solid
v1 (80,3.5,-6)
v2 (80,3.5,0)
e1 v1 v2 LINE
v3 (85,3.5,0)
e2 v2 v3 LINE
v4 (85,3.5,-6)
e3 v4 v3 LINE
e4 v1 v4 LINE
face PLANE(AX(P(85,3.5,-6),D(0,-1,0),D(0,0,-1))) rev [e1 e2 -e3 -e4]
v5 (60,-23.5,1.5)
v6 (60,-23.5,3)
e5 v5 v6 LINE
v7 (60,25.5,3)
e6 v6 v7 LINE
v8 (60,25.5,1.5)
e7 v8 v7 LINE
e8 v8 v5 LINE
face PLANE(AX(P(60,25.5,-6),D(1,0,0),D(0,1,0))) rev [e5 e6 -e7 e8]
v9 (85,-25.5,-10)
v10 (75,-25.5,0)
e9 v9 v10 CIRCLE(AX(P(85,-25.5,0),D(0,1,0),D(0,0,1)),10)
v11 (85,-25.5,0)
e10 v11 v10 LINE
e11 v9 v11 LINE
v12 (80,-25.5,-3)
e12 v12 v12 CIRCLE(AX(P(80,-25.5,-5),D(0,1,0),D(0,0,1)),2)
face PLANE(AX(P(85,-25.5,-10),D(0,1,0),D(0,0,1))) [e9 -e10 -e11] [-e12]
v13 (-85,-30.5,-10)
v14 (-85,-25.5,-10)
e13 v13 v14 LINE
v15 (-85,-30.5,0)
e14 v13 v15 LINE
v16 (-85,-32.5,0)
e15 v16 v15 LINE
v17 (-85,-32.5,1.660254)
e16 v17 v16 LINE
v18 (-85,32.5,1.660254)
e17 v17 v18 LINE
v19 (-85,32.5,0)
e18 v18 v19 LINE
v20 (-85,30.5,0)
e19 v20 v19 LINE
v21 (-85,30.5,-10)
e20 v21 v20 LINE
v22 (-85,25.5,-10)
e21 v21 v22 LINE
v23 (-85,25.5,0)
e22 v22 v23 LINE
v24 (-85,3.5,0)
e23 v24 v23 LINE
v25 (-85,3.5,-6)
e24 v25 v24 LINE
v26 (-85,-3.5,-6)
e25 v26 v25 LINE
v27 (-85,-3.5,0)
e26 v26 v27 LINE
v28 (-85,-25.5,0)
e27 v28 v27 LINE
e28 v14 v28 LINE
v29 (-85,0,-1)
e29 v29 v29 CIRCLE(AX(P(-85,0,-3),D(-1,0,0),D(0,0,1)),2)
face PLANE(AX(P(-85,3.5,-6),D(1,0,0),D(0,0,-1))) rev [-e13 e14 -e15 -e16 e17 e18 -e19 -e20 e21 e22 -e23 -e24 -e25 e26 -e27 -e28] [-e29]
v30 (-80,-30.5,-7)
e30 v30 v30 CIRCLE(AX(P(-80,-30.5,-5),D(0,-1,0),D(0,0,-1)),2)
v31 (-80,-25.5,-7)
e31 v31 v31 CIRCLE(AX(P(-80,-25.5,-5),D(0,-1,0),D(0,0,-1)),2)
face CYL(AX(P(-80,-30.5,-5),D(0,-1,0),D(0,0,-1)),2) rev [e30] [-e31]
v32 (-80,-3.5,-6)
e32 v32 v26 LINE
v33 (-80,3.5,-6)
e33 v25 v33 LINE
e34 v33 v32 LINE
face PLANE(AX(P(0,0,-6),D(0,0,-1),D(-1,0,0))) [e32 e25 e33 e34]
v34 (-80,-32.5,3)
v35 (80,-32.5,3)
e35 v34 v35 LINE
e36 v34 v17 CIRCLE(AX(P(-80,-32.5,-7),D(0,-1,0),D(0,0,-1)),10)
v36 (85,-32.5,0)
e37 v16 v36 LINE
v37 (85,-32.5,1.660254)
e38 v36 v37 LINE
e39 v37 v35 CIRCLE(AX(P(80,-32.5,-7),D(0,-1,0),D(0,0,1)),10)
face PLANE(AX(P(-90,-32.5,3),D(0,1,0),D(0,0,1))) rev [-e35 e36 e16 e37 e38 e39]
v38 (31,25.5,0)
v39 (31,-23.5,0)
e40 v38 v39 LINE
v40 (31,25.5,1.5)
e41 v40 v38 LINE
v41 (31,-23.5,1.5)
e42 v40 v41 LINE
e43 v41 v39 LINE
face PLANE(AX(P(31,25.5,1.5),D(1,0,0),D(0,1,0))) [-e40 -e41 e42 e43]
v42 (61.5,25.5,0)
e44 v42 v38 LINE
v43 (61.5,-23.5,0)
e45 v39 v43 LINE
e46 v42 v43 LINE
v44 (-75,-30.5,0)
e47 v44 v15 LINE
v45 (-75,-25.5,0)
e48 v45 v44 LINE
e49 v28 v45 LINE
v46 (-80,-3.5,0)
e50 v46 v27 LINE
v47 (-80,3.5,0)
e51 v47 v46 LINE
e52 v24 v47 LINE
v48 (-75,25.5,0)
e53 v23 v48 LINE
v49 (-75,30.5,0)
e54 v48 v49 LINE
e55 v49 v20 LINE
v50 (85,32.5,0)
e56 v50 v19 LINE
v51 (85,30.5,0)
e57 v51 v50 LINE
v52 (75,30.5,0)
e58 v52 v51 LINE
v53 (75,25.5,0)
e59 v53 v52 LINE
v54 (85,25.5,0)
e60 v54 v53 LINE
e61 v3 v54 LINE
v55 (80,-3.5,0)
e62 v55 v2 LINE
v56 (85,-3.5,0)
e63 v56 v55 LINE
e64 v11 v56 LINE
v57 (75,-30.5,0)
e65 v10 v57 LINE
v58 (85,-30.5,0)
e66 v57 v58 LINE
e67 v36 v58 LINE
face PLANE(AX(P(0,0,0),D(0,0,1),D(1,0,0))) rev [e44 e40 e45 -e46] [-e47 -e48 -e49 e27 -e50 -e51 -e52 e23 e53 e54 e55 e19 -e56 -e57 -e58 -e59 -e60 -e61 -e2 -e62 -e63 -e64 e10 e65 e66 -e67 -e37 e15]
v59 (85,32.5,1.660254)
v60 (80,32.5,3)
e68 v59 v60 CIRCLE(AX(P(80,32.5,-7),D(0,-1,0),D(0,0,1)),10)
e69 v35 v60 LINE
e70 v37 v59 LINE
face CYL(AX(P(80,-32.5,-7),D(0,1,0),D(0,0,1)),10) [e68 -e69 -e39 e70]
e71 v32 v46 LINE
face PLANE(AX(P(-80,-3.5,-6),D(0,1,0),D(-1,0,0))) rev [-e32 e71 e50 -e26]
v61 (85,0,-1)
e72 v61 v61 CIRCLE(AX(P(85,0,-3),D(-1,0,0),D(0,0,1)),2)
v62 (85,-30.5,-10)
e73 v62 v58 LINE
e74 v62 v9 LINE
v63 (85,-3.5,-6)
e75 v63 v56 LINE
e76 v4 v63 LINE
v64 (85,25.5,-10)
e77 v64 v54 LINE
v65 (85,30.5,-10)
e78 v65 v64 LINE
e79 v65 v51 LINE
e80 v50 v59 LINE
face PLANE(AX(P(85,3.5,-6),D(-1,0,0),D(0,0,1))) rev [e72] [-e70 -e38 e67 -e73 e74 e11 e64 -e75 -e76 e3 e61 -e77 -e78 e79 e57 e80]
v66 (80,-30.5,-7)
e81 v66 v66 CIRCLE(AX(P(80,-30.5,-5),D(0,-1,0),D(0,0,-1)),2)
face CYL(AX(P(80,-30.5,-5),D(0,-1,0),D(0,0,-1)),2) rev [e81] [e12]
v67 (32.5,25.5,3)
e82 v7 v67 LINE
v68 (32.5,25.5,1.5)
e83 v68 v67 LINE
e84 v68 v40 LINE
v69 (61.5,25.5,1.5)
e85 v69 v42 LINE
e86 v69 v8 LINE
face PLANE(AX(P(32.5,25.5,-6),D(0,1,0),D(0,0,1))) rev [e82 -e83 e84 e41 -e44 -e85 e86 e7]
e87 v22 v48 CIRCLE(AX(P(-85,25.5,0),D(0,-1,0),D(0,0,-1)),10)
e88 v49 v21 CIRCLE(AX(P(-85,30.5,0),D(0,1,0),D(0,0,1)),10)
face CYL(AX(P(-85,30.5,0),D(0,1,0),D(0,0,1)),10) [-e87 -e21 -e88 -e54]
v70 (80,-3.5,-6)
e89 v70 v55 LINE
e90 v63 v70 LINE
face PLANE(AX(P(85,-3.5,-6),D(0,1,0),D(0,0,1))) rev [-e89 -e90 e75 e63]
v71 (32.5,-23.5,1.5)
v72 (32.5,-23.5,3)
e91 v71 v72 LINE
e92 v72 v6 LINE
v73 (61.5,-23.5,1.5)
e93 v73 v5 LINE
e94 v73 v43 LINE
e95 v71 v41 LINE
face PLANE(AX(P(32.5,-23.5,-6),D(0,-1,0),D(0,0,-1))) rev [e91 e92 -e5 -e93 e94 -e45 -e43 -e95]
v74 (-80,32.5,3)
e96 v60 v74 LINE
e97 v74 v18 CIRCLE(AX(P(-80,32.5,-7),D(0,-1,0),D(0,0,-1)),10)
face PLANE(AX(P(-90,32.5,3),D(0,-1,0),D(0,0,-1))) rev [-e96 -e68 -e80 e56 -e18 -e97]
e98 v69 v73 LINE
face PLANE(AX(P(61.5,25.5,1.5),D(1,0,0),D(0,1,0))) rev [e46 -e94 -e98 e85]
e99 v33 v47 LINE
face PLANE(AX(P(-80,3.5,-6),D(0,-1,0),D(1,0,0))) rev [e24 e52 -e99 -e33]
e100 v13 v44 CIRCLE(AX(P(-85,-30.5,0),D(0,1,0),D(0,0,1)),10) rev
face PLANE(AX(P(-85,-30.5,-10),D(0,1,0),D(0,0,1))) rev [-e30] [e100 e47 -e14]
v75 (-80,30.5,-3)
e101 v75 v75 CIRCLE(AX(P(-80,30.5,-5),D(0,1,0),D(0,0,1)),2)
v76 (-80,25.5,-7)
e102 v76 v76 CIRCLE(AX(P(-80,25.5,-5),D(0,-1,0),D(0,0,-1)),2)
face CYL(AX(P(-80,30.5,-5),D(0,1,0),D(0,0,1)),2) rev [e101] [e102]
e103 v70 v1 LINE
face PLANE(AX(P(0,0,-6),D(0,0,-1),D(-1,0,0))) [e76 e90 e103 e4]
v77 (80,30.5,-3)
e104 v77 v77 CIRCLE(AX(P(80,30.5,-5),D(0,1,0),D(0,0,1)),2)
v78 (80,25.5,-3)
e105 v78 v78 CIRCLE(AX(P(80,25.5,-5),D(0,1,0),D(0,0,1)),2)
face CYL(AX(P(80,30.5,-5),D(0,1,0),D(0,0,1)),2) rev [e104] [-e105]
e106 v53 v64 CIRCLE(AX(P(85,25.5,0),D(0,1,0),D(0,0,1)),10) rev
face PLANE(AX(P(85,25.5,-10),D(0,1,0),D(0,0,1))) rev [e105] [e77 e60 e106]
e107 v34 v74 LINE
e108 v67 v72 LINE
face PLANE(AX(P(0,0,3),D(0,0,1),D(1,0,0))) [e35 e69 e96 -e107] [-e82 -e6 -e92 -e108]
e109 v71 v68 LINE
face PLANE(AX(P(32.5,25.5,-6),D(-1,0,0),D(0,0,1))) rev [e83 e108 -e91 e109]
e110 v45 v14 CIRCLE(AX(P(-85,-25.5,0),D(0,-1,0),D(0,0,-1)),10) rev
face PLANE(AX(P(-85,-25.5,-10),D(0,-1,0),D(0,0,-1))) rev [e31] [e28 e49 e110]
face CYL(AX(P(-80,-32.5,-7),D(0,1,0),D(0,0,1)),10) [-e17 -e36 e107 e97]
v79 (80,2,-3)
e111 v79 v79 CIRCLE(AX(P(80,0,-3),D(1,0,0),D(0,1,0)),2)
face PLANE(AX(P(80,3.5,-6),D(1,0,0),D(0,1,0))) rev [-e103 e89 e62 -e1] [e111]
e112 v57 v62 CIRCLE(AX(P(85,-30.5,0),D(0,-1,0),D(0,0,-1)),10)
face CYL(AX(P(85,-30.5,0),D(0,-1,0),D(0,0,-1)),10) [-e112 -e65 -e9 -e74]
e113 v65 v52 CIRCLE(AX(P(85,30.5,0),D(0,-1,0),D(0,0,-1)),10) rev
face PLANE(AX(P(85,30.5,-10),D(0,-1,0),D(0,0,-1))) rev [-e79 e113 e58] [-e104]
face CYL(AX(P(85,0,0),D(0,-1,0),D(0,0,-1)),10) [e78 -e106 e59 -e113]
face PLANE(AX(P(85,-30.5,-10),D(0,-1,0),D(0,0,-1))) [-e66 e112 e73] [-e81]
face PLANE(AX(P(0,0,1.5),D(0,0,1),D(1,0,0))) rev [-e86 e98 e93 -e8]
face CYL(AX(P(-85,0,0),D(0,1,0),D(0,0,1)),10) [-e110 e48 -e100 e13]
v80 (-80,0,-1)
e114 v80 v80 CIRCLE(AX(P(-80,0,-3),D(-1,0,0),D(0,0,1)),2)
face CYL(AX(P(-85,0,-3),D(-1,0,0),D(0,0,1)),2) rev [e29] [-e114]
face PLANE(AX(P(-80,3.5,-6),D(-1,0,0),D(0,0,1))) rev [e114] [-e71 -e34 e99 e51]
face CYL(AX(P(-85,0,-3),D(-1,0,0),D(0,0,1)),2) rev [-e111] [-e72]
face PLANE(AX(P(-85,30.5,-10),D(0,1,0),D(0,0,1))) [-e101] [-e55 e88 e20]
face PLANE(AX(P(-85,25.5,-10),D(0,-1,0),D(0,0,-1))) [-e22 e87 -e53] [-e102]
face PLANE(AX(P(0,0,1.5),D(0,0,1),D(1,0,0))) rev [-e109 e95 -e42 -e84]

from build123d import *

# Parameters (mm, degrees)
SKIZZE1_W                                  = 180
SKIZZE1_H                                  = 65
AUFSATZ_LINEAR_AUSTRAGEN1_DEPTH            = 3
SKIZZE3_W                                  = 5
SKIZZE3_H                                  = 7
AUFSATZ_LINEAR_AUSTRAGEN2_DEPTH            = 6
F_4_0_4_DURCHMESSER_BOHRUNG1_D             = 4
SCHNITT_LINEAR_AUSTRAGEN1_DEPTH            = 112.180034179
SKIZZE7_W                                  = 27.5
SKIZZE7_H                                  = 49
SCHNITT_LINEAR_AUSTRAGEN2_DEPTH            = 92.445338864
SKIZZE8_W                                  = 10
SKIZZE8_H                                  = 5
AUFSATZ_LINEAR_AUSTRAGEN3_DEPTH            = 10
SPIEGELN1_AT_THE_SECOND_PLANE_COPY_1_SKE_W = 10
SPIEGELN1_AT_THE_SECOND_PLANE_COPY_1_SKE_H = 5
SPIEGELN1_AT_THE_SECOND_PLANE_COPY_1_DEPTH = 10
VERRUNDUNG1_R                              = 10
F_4_0_4_DURCHMESSER_BOHRUNG2_D             = 4
F_4_0_4_DURCHMESSER_BOHRUNG2_DEPTH         = 5
F_4_0_4_DURCHMESSER_BOHRUNG3_D             = 4
F_4_0_4_DURCHMESSER_BOHRUNG3_DEPTH         = 5
SKIZZE13_W                                 = 30.5
SKIZZE13_H                                 = 49
SCHNITT_LINEAR_AUSTRAGEN4_DEPTH            = 1.5


with BuildPart() as part:
    # Skizze1 → Aufsatz-Linear austragen1 (new body)
    with BuildSketch(Plane.XY):
        Rectangle(SKIZZE1_W, SKIZZE1_H)
    extrude(amount=AUFSATZ_LINEAR_AUSTRAGEN1_DEPTH)

    # Skizze3 → Aufsatz-Linear austragen2 (add)
    with BuildSketch(Plane(origin=(0, 0, 0), x_dir=(-1, 0, 0), z_dir=(0, 0, -1))):
        with Locations((-82.5, 0)):
            Rectangle(SKIZZE3_W, SKIZZE3_H)
        with Locations((82.5, 0)):
            Rectangle(SKIZZE3_W, SKIZZE3_H)
    extrude(amount=AUFSATZ_LINEAR_AUSTRAGEN2_DEPTH)

    # Ø4.0 (4) Durchmesser Bohrung1 (through all)
    with Locations(Plane.ZY.offset(85)):
        with Locations((-3, 0)):
            Hole(F_4_0_4_DURCHMESSER_BOHRUNG1_D / 2)

    # Skizze6 → Schnitt-Linear austragen1 (cut, through all)
    with BuildSketch(Plane(origin=(0, 32.5, 0), x_dir=(1, 0, 0), z_dir=(0, 1, 0))):
        with BuildLine():
            Line((-80, -3), (-90, -3))
            Line((-90, -3), (-90, 0))
            Line((-90, 0), (-85, 0))
            Line((-85, 0), (-85, -1.660254038))
            ThreePointArc((-85, -1.660254038), (-82.588190451, -2.659258263), (-80, -3))
        make_face()
        with BuildLine():
            Line((80, -3), (90, -3))
            Line((90, -3), (90, 0))
            Line((90, 0), (85, 0))
            Line((85, 0), (85, -1.660254038))
            ThreePointArc((85, -1.660254038), (82.588190451, -2.659258263), (80, -3))
        make_face()
    extrude(amount=-SCHNITT_LINEAR_AUSTRAGEN1_DEPTH, mode=Mode.SUBTRACT)

    # Skizze7 → Schnitt-Linear austragen2 (cut, through all)
    with BuildSketch(Plane.XY.offset(3)):
        with Locations((46.25, 1)):
            Rectangle(SKIZZE7_W, SKIZZE7_H)
    extrude(amount=-SCHNITT_LINEAR_AUSTRAGEN2_DEPTH, mode=Mode.SUBTRACT)

    # Skizze8 → Aufsatz-Linear austragen3 (add)
    with BuildSketch(Plane(origin=(0, 0, 0), x_dir=(-1, 0, 0), z_dir=(0, 0, -1))):
        with Locations((-80, 28)):
            Rectangle(SKIZZE8_W, SKIZZE8_H)
    aufsatz_linear_austragen3 = extrude(amount=AUFSATZ_LINEAR_AUSTRAGEN3_DEPTH)

    # Spiegeln1: Aufsatz-Linear austragen3 across plane
    add(aufsatz_linear_austragen3.mirror(Plane(origin=(0, 0, 0), x_dir=(0, 0, 1), z_dir=(1, 0, 0))))

    # Spiegeln1 at the second plane: Aufsatz-Linear austragen3 across plane
    add(aufsatz_linear_austragen3.mirror(Plane.ZX))

    # Spiegeln1 at the second plane copy 1 ske → Spiegeln1 at the second plane copy 1 (add)
    with BuildSketch(Plane(origin=(0, 0, 0), x_dir=(1, 0, 0), z_dir=(0, 0, -1))):
        with Locations((-80, 28)):
            Rectangle(SPIEGELN1_AT_THE_SECOND_PLANE_COPY_1_SKE_W, SPIEGELN1_AT_THE_SECOND_PLANE_COPY_1_SKE_H)
    extrude(amount=SPIEGELN1_AT_THE_SECOND_PLANE_COPY_1_DEPTH)

    # Verrundung1
    verrundung1_edges = [part.edges().sort_by_distance(p)[0] for p in [
        (75, 28, -10),
        (75, -28, -10),
        (-75, 28, -10),
        (-75, -28, -10),
    ]]
    fillet(verrundung1_edges, radius=VERRUNDUNG1_R - 0.0001)  # a hair under: the kernel refuses the full size

    # Ø4.0 (4) Durchmesser Bohrung2
    with Locations(Plane(origin=(0, 30.5, 0), x_dir=(1, 0, 0), z_dir=(0, 1, 0))):
        with Locations((-80, 5), (80, 5)):
            Hole(F_4_0_4_DURCHMESSER_BOHRUNG2_D / 2, depth=F_4_0_4_DURCHMESSER_BOHRUNG2_DEPTH)

    # Ø4.0 (4) Durchmesser Bohrung3
    with Locations(Plane(origin=(0, -30.5, 0), x_dir=(-1, 0, 0), z_dir=(0, -1, 0))):
        with Locations((-80, 5), (80, 5)):
            Hole(F_4_0_4_DURCHMESSER_BOHRUNG3_D / 2, depth=F_4_0_4_DURCHMESSER_BOHRUNG3_DEPTH)

    # Skizze13 → Schnitt-Linear austragen4 (cut)
    with BuildSketch(Plane(origin=(0, 0, 0), x_dir=(-1, 0, 0), z_dir=(0, 0, -1))):
        with Locations((-46.25, 1)):
            Rectangle(SKIZZE13_W, SKIZZE13_H)
    extrude(amount=-SCHNITT_LINEAR_AUSTRAGEN4_DEPTH, mode=Mode.SUBTRACT)


solid = part.part
